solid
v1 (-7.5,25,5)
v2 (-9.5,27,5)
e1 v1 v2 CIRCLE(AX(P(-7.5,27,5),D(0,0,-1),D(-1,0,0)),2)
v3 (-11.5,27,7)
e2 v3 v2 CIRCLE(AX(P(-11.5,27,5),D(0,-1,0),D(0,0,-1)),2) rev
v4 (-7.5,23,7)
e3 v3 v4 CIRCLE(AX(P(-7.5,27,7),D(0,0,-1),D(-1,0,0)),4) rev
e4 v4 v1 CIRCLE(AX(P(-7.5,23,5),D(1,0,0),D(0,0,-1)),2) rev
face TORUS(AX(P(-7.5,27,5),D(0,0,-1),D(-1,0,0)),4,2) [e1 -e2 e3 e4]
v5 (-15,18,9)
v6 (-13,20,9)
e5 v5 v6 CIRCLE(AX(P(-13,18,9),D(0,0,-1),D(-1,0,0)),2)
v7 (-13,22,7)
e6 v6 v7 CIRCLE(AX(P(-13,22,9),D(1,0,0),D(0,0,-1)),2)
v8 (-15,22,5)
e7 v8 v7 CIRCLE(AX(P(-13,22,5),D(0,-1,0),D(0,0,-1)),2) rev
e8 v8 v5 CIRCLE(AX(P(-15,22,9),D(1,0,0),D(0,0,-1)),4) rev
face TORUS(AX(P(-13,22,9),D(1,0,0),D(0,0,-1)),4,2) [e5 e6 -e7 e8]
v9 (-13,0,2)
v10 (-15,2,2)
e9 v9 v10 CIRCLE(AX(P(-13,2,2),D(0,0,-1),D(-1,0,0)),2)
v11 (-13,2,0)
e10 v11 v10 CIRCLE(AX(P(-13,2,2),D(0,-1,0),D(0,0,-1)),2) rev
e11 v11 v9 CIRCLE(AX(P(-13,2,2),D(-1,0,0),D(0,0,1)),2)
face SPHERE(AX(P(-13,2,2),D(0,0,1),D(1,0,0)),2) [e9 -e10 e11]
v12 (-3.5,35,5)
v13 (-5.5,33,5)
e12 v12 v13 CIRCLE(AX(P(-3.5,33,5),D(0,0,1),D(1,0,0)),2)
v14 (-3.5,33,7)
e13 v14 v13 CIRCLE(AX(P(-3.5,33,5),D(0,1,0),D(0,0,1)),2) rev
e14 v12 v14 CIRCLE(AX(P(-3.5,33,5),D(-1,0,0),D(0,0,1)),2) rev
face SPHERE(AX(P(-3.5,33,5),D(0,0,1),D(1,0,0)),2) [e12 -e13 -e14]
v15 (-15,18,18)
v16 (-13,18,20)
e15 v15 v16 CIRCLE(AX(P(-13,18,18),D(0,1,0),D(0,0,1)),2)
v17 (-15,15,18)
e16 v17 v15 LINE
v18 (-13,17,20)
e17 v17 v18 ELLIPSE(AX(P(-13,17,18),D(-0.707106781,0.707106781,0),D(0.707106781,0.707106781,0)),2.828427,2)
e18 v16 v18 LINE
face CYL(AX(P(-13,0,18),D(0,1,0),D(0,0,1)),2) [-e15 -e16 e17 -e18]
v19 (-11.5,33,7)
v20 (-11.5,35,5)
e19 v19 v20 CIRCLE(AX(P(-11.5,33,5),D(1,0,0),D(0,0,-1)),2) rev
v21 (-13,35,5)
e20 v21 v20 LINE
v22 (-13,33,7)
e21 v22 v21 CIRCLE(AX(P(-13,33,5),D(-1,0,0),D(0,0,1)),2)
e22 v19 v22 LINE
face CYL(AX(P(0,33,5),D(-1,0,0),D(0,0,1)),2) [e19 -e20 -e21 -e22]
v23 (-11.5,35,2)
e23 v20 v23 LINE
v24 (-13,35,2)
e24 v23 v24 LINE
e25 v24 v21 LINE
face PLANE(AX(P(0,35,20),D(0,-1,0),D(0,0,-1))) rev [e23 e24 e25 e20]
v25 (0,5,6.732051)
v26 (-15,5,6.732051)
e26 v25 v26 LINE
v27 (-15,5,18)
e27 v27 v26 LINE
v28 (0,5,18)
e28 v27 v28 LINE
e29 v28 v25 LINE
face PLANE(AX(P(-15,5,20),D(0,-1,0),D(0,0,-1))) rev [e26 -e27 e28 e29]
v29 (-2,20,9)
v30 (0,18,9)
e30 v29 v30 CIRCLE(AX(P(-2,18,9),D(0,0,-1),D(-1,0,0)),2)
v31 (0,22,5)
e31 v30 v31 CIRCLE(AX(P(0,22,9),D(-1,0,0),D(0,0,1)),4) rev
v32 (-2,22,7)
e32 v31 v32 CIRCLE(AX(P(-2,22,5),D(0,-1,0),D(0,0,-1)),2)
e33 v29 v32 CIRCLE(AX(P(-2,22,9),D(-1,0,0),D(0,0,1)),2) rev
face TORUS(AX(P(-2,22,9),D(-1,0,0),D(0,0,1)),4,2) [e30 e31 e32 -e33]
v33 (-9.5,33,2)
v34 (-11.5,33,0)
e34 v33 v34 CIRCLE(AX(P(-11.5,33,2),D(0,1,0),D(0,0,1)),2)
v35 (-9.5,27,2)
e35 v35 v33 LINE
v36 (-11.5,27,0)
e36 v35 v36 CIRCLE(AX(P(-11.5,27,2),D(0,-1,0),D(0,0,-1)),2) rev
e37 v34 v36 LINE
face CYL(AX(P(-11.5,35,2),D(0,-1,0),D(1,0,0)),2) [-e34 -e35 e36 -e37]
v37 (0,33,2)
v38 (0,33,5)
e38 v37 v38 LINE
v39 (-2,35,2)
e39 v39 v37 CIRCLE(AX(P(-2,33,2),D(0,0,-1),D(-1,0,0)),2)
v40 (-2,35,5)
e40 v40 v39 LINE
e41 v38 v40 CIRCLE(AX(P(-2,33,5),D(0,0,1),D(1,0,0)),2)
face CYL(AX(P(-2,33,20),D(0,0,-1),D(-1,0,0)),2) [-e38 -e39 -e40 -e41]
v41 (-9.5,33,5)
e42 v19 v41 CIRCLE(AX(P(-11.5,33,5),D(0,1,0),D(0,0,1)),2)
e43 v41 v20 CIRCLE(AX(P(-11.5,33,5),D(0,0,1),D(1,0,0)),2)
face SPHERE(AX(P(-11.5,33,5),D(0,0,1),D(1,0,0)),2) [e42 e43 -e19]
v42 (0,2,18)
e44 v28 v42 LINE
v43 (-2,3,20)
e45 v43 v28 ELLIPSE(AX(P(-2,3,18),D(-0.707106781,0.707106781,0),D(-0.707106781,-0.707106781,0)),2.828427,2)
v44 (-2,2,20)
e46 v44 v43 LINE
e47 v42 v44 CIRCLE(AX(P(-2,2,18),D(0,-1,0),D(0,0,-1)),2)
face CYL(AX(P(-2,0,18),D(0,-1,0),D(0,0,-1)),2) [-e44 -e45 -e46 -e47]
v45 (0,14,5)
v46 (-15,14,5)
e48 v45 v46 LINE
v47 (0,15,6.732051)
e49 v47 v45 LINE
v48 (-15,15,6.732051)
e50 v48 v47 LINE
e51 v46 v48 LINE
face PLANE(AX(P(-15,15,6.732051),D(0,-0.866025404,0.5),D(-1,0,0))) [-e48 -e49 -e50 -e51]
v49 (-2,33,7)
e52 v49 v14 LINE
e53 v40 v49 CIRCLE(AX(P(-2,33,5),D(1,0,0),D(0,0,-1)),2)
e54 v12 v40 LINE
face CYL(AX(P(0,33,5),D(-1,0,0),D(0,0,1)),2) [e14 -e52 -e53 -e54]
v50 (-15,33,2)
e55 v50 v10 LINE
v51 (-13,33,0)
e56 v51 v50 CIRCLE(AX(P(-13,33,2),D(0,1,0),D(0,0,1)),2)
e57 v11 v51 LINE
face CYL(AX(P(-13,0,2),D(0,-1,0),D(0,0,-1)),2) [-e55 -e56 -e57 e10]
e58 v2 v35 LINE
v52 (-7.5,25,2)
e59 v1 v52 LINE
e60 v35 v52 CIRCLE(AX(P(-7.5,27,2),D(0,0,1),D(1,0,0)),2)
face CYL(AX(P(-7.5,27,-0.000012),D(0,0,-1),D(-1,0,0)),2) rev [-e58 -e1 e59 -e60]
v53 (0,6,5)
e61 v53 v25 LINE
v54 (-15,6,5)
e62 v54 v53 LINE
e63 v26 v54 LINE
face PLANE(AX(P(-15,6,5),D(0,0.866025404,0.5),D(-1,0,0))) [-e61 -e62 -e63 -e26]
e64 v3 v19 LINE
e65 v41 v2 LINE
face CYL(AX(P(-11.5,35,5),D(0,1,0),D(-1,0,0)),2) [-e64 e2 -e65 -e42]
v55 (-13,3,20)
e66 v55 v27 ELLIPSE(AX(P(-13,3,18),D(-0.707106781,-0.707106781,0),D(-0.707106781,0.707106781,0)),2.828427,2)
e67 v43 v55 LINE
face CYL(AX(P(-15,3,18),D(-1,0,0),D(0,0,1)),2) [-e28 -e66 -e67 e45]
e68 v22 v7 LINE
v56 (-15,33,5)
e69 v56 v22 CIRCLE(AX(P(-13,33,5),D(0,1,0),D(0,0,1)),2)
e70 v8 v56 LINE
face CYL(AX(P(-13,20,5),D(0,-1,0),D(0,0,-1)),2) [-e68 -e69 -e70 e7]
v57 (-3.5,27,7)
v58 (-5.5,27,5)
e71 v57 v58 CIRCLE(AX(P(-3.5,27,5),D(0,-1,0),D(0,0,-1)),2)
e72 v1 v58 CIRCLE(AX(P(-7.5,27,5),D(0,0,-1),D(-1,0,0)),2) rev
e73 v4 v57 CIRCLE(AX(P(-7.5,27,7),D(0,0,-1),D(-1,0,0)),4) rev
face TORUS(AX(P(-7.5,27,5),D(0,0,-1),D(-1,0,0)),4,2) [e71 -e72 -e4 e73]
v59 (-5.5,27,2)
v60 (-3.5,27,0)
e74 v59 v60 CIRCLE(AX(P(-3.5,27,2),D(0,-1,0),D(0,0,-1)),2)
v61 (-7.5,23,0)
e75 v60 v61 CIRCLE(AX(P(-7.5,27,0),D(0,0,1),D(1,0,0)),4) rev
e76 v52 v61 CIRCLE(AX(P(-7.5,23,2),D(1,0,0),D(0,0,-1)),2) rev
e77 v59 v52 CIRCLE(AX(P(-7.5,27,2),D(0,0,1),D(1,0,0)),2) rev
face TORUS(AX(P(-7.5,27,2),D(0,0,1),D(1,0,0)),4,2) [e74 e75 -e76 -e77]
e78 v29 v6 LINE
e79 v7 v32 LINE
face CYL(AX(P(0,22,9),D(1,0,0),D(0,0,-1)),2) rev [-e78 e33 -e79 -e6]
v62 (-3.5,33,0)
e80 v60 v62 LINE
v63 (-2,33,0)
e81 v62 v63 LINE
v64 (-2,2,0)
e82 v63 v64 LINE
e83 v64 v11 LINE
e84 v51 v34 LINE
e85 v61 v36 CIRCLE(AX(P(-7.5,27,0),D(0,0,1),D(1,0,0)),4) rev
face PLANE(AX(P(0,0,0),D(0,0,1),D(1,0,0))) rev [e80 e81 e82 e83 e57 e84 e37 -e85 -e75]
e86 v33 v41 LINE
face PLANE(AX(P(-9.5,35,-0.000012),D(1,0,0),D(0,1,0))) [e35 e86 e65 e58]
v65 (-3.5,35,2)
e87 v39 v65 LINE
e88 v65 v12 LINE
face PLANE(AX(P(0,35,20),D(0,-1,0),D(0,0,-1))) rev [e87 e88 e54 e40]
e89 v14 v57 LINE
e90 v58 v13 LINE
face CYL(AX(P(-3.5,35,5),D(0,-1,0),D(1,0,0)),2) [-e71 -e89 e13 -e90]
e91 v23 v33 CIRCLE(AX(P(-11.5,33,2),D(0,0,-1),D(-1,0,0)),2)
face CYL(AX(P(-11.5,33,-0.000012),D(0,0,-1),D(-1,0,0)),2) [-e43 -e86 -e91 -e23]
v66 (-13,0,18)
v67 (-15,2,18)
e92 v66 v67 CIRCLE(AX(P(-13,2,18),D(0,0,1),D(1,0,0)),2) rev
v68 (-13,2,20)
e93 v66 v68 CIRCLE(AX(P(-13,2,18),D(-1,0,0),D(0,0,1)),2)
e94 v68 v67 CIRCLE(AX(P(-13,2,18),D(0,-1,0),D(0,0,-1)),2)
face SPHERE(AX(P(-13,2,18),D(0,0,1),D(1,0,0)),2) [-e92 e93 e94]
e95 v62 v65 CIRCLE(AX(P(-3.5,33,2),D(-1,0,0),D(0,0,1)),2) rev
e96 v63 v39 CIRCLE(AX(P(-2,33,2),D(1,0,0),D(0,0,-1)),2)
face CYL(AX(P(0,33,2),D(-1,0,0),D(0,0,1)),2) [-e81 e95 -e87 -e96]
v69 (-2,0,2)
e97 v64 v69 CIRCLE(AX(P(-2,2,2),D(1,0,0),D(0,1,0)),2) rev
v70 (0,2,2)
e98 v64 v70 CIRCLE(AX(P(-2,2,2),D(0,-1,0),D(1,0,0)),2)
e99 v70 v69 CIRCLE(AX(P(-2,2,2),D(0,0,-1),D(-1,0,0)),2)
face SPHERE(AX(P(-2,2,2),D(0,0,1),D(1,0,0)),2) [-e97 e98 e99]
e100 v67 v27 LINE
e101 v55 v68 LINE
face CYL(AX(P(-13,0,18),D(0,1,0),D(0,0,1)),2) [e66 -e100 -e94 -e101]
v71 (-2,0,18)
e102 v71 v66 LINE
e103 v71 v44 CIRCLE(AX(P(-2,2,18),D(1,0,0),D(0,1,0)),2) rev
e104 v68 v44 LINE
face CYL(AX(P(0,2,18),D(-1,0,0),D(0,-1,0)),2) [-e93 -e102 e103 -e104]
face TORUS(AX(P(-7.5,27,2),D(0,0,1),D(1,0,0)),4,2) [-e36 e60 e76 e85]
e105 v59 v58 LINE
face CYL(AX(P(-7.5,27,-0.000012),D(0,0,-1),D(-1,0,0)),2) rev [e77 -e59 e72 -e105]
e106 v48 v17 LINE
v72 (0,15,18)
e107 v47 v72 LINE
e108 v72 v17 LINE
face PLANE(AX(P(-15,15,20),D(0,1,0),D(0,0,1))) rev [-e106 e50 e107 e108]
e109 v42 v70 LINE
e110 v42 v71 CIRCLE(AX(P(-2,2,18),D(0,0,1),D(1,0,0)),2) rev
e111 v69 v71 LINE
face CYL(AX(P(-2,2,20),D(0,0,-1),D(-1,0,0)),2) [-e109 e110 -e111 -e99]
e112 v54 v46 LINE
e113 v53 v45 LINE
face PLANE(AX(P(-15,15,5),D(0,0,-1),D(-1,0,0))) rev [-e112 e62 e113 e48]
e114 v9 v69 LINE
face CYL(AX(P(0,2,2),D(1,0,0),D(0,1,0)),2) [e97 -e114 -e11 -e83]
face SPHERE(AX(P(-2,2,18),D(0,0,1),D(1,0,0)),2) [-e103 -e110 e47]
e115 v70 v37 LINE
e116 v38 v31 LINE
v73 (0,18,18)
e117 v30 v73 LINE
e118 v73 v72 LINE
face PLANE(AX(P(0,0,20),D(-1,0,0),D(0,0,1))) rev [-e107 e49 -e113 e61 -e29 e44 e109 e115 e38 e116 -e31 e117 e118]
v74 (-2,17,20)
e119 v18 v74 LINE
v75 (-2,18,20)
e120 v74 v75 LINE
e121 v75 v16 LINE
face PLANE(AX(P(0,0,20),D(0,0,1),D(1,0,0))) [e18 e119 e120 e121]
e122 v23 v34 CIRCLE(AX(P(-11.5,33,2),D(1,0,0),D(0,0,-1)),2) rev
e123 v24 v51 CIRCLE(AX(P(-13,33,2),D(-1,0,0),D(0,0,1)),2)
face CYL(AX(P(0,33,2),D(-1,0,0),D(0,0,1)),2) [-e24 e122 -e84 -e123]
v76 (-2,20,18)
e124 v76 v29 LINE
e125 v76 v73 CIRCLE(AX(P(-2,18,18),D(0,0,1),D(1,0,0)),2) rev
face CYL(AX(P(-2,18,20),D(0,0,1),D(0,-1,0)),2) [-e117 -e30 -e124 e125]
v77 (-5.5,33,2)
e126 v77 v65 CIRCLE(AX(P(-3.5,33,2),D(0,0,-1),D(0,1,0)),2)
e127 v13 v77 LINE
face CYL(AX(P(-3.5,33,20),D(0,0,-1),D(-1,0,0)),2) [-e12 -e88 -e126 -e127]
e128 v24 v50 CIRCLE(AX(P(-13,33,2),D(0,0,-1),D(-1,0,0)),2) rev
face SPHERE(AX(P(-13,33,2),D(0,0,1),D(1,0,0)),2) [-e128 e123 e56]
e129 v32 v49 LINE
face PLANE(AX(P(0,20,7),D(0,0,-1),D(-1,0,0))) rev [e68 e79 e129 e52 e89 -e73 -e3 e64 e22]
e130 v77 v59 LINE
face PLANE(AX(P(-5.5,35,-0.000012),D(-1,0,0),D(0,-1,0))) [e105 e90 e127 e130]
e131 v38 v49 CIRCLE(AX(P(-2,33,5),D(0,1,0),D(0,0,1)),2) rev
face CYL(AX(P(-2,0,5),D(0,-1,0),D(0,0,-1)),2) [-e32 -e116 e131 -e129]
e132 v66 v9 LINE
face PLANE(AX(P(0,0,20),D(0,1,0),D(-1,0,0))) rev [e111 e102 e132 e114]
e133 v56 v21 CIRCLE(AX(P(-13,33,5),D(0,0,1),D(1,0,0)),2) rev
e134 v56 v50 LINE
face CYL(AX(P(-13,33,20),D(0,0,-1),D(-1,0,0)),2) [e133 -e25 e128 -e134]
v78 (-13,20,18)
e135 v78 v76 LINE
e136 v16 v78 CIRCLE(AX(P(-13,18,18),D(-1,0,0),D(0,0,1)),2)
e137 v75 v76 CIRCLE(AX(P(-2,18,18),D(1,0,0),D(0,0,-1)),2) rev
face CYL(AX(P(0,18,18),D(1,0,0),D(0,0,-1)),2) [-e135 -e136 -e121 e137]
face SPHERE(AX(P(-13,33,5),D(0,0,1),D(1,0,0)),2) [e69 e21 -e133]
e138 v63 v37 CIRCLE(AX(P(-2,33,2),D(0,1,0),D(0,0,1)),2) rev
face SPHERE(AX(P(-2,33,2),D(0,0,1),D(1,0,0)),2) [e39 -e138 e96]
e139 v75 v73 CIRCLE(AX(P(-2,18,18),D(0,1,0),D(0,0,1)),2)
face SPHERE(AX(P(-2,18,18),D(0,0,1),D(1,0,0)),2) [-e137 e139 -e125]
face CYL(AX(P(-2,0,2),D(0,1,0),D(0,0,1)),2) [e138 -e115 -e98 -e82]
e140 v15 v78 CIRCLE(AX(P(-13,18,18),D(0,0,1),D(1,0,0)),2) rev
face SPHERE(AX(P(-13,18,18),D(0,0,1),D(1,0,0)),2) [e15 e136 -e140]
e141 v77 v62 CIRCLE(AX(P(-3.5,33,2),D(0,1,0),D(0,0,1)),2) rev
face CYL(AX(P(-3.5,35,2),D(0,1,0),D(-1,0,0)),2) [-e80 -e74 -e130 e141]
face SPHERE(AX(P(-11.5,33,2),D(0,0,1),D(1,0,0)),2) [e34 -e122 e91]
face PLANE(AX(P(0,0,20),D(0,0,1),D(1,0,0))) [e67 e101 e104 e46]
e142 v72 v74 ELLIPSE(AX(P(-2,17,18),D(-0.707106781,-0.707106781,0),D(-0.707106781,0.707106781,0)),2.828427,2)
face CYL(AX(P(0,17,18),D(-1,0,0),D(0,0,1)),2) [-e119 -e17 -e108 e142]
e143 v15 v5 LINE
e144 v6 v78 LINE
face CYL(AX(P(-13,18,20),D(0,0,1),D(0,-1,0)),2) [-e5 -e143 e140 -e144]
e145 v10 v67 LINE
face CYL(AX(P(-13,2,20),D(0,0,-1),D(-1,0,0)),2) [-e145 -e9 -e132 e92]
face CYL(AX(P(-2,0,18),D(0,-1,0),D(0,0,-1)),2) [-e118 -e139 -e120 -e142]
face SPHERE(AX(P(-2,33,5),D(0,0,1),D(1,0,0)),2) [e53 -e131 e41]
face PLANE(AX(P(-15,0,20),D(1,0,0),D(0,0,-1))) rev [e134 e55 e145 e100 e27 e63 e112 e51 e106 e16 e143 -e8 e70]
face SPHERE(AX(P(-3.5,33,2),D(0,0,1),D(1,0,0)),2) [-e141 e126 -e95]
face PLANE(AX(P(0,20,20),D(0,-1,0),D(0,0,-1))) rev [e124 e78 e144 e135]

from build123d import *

# Parameters (mm, degrees)
SKETCH1_W                      = 15
SKETCH1_H                      = 35
BOSS_EXTRUDE1_DEPTH            = 20
SKETCH2_W                      = 15
SKETCH2_H                      = 10
CUT_EXTRUDE1_DEPTH             = 44.011626335
SKETCH4_W                      = 13
SKETCH4_H                      = 15
CUT_EXTRUDE3_DEPTH             = 44.011626335
CUT_EXTRUDE4_REACH             = 45.012
SKETCH5_W                      = 4
SKETCH5_H                      = 10
CUT_EXTRUDE4_DIRECTION_2_DEPTH = 44.011626335
FILLET2_R                      = 2
CHAMFER1_SIZE                  = 1
CHAMFER1_SIZE2                 = 1.732050808


with BuildPart() as part:
    # Sketch1 → Boss-Extrude1 (new body)
    with BuildSketch(Plane.XY):
        with Locations((-7.5, 17.5)):
            Rectangle(SKETCH1_W, SKETCH1_H)
    extrude(amount=BOSS_EXTRUDE1_DEPTH)

    # Sketch2 → Cut-Extrude1 (cut, through all)
    with BuildSketch(Plane(origin=(0, 0, 0), x_dir=(0, 0, -1), z_dir=(1, 0, 0))):
        with Locations((-12.5, 10)):
            Rectangle(SKETCH2_W, SKETCH2_H)
    extrude(amount=-CUT_EXTRUDE1_DEPTH, mode=Mode.SUBTRACT)

    # Sketch4 → Cut-Extrude3 (cut, through all)
    with BuildSketch(Plane.ZY.offset(15)):
        with Locations((13.5, 27.5)):
            Rectangle(SKETCH4_W, SKETCH4_H)
    extrude(amount=-CUT_EXTRUDE3_DEPTH, mode=Mode.SUBTRACT)

    # Sketch5 → Cut-Extrude4 (cut, up to next)
    with BuildSketch(Plane(origin=(0, 0, 0), x_dir=(-1, 0, 0), z_dir=(0, 0, -1)), mode=Mode.PRIVATE) as cut_extrude4_sk1:
        with Locations((7.5, 30)):
            Rectangle(SKETCH5_W, SKETCH5_H)
    cut_extrude4_tool1 = extrude(cut_extrude4_sk1.sketch, amount=-CUT_EXTRUDE4_REACH, mode=Mode.PRIVATE) & part.part
    add(cut_extrude4_tool1.solids().sort_by_distance((-7.5, 30, 0))[0], mode=Mode.SUBTRACT)

    # Sketch5 → Cut-Extrude4 direction 2 (cut)
    with BuildSketch(Plane(origin=(0, 0, 0), x_dir=(-1, 0, 0), z_dir=(0, 0, -1))):
        with Locations((7.5, 30)):
            Rectangle(SKETCH5_W, SKETCH5_H)
    extrude(amount=CUT_EXTRUDE4_DIRECTION_2_DEPTH, mode=Mode.SUBTRACT)

    # Fillet2
    fillet2_edges = [part.edges().sort_by_distance(p)[0] for p in [
        (0, 17.5, 20),
        (-15, 2.5, 20),
        (-7.5, 0, 20),
        (-7.5, 5, 20),
        (-7.5, 15, 20),
        (-15, 17.5, 20),
        (-15, 35, 3.5),
        (0, 35, 3.5),
        (0, 20, 13.5),
        (-7.5, 20, 20),
        (0, 27.5, 7),
        (-7.5, 20, 7),
        (-2.75, 35, 7),
        (-15, 27.5, 7),
        (-15, 20, 13.5),
        (-12.25, 35, 7),
        (-12.25, 35, 0),
        (-5.5, 35, 3.5),
        (-5.5, 25, 3.5),
        (-9.5, 25, 3.5),
        (-9.5, 35, 3.5),
        (-5.5, 30, 0),
        (-7.5, 25, 0),
        (-9.5, 30, 0),
        (0, 2.5, 20),
        (-7.5, 0, 0),
        (-7.5, 25, 7),
        (-5.5, 30, 7),
        (-9.5, 30, 7),
        (-15, 17.5, 0),
        (-2.75, 35, 0),
        (0, 17.5, 0),
        (0, 0, 10),
        (-15, 0, 10),
    ]]
    fillet(fillet2_edges, radius=FILLET2_R - 0.0001)  # a hair under: the kernel refuses the full size

    # Chamfer1
    chamfer1_edges = [part.edges().sort_by_distance(p)[0] for p in [
        (-7.5, 15, 5),
        (-7.5, 5, 5),
    ]]
    chamfer1_side = [part.faces().sort_by_distance(p)[0] for p in [
        (-7.5, 10, 5),
    ]]
    chamfer(chamfer1_edges, length=CHAMFER1_SIZE, length2=CHAMFER1_SIZE2, reference=chamfer1_side[0])


solid = part.part
